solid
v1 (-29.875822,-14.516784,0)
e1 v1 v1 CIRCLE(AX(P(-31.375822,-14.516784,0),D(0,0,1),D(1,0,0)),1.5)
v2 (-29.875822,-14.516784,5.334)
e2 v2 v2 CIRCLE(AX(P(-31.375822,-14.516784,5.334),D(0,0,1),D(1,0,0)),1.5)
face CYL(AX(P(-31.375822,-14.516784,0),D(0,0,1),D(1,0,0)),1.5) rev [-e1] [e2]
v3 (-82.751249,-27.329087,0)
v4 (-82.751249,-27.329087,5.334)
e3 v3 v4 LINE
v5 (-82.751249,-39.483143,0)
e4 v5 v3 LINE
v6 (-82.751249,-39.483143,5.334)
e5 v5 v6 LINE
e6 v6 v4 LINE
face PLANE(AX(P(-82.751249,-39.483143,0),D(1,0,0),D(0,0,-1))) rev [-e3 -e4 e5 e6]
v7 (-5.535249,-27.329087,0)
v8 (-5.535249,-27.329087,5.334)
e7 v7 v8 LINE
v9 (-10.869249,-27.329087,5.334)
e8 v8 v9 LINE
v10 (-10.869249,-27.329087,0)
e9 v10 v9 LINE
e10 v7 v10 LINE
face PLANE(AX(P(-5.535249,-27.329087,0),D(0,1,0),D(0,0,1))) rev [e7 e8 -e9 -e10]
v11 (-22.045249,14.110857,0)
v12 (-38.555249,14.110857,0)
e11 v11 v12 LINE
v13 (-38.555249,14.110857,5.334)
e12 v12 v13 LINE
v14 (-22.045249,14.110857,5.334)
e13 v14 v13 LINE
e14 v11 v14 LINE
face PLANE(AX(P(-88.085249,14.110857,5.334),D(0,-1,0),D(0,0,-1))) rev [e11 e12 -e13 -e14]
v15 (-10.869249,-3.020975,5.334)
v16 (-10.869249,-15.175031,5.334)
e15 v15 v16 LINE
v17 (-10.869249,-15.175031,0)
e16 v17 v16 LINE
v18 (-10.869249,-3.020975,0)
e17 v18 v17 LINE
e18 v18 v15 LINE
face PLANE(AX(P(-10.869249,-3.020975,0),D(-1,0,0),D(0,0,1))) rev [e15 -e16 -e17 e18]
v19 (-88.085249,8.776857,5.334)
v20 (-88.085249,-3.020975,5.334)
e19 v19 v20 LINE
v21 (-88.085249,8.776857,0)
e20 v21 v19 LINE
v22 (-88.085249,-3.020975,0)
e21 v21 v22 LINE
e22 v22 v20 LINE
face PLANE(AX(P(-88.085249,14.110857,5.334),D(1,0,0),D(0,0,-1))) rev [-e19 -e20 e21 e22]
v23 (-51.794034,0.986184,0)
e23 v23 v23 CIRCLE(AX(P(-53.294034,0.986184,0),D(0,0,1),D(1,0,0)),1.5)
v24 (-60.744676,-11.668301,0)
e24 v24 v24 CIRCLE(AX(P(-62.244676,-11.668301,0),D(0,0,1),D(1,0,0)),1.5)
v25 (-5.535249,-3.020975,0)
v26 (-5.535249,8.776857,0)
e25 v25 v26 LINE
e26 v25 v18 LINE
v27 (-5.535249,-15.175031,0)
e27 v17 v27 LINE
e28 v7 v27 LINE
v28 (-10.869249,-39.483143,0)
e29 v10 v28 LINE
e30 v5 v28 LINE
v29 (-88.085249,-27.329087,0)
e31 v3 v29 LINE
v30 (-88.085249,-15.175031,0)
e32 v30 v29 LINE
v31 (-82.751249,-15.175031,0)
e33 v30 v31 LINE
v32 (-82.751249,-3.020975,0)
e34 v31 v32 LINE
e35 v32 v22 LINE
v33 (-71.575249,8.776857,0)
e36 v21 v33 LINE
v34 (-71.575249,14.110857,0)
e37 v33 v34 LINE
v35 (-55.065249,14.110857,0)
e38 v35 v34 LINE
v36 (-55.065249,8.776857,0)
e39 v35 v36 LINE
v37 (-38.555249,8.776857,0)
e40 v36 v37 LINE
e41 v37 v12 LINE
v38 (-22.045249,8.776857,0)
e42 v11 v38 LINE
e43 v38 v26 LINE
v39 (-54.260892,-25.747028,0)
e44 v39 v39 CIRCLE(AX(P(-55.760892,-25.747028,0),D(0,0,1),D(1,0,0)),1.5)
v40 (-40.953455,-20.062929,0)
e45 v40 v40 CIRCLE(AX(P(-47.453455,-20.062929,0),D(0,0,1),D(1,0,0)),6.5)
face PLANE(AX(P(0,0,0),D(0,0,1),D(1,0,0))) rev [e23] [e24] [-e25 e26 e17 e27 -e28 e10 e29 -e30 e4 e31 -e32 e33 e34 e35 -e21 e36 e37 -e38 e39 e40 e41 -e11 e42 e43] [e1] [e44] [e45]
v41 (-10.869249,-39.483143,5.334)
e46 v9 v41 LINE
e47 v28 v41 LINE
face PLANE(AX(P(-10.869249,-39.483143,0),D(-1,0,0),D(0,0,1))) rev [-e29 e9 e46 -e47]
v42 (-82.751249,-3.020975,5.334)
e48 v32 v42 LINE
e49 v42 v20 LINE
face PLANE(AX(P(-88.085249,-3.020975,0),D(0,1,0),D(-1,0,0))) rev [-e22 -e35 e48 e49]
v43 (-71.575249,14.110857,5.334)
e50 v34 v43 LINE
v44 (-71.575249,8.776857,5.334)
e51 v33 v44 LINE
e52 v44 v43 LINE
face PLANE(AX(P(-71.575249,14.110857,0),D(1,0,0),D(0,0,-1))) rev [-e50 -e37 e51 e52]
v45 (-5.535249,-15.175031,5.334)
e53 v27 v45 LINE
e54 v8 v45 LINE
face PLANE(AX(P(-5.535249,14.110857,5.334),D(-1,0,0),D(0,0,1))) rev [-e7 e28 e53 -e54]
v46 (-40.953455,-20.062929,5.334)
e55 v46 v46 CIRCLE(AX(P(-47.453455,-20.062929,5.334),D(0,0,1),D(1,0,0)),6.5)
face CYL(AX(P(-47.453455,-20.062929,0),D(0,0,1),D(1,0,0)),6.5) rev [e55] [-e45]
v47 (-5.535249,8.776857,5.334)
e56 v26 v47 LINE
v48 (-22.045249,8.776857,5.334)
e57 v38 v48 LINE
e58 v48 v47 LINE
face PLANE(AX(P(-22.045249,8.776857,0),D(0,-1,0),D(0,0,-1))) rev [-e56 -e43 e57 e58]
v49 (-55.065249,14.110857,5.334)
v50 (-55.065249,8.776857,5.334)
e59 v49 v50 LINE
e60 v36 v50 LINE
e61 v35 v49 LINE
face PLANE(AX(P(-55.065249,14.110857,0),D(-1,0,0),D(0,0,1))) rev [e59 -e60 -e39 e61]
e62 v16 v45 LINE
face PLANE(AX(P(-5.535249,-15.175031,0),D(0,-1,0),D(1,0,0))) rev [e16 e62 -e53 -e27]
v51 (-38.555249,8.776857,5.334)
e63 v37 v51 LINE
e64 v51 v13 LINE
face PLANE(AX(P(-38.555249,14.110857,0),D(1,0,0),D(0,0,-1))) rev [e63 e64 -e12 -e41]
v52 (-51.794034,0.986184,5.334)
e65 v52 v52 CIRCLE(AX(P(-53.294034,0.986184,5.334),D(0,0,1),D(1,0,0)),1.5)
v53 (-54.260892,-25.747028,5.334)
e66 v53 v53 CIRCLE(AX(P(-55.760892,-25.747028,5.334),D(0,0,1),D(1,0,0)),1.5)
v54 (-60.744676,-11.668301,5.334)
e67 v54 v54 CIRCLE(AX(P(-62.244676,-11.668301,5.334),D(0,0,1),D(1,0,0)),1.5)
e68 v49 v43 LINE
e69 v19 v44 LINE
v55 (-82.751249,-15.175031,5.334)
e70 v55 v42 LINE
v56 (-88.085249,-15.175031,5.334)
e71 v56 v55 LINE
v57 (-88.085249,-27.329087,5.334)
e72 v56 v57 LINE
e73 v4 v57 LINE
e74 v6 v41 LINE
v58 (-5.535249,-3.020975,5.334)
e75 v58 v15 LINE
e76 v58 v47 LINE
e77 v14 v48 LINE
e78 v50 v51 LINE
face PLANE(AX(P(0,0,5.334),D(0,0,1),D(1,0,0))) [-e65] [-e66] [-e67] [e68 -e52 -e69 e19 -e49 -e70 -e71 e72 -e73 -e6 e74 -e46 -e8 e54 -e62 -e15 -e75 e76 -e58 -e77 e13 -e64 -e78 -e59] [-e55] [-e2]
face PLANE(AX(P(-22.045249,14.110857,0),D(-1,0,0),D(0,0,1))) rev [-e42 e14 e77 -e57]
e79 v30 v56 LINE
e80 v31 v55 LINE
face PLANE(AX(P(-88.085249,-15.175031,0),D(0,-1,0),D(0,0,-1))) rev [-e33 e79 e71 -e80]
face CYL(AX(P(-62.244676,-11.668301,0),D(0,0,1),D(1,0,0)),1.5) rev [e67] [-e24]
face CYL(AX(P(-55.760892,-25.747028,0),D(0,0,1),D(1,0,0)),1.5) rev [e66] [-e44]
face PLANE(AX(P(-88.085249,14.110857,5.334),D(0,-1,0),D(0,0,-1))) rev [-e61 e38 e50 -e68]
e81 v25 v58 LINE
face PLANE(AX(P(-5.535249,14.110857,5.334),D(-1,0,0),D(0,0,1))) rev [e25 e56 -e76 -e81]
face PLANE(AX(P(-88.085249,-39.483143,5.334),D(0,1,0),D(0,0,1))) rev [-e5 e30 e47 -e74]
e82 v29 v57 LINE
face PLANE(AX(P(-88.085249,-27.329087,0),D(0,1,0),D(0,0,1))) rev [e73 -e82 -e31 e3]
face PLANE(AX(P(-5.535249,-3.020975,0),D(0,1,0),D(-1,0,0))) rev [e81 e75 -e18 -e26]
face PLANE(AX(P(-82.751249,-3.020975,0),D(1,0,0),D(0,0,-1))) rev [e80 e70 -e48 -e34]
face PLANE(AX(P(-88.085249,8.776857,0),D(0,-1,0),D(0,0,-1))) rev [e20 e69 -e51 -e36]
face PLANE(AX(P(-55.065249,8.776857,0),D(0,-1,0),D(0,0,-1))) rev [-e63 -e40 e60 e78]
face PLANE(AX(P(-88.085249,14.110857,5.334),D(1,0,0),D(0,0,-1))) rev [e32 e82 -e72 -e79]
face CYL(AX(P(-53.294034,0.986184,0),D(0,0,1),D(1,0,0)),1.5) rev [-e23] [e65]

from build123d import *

# Parameters (mm, degrees)
SKETCH1_W                = 82.55
SKETCH1_H                = 53.594
BOSS_EXTRUDE1_DEPTH      = 5.334
CUT_EXTRUDE1_START       = -88.085249325
CUT_EXTRUDE1_OUTLINE_W   = 5.334
CUT_EXTRUDE1_OUTLINE_H   = 5.334
CUT_EXTRUDE1_DEPTH       = 16.51
CUT_EXTRUDE1_START_2     = -55.065249325
CUT_EXTRUDE1_2_OUTLINE_W = 5.334
CUT_EXTRUDE1_2_OUTLINE_H = 5.334
CUT_EXTRUDE1_2_DEPTH     = 16.51
CUT_EXTRUDE1_START_3     = -22.045249325
CUT_EXTRUDE1_3_OUTLINE_W = 5.334
CUT_EXTRUDE1_3_OUTLINE_H = 5.334
CUT_EXTRUDE1_3_DEPTH     = 16.51
SKETCH3_W                = 5.334
SKETCH3_H                = 12.154056038
CUT_EXTRUDE2_DEPTH       = 97.676684204
SKETCH5_R                = 1.5
SKETCH5_R_2              = 6.5
CUT_EXTRUDE4_DEPTH       = 97.676684204


# Read off the part's stored shape, not the designer's step: Cut-Extrude1
with BuildPart() as part:
    # Sketch1 → Boss-Extrude1 (new body)
    with BuildSketch(Plane.XY):
        with Locations((-46.810249325, -12.686142782)):
            Rectangle(SKETCH1_W, SKETCH1_H)
    extrude(amount=BOSS_EXTRUDE1_DEPTH)

    # Cut-Extrude1 outline → Cut-Extrude1 (cut)
    with BuildSketch(Plane.YZ.offset(CUT_EXTRUDE1_START)):
        with Locations((11.443857218, 2.667)):
            Rectangle(CUT_EXTRUDE1_OUTLINE_W, CUT_EXTRUDE1_OUTLINE_H)
    extrude(amount=CUT_EXTRUDE1_DEPTH, mode=Mode.SUBTRACT)

    # Cut-Extrude1 2 outline → Cut-Extrude1 2 (cut)
    with BuildSketch(Plane.YZ.offset(CUT_EXTRUDE1_START_2)):
        with Locations((11.443857218, 2.667)):
            Rectangle(CUT_EXTRUDE1_2_OUTLINE_W, CUT_EXTRUDE1_2_OUTLINE_H)
    extrude(amount=CUT_EXTRUDE1_2_DEPTH, mode=Mode.SUBTRACT)

    # Cut-Extrude1 3 outline → Cut-Extrude1 3 (cut)
    with BuildSketch(Plane.YZ.offset(CUT_EXTRUDE1_START_3)):
        with Locations((11.443857218, 2.667)):
            Rectangle(CUT_EXTRUDE1_3_OUTLINE_W, CUT_EXTRUDE1_3_OUTLINE_H)
    extrude(amount=CUT_EXTRUDE1_3_DEPTH, mode=Mode.SUBTRACT)

    # Sketch3 → Cut-Extrude2 (cut, through all)
    with BuildSketch(Plane.XY.offset(5.334)):
        with Locations((-85.418249325, -33.406114763)):
            Rectangle(SKETCH3_W, SKETCH3_H)
        with Locations((-85.418249325, -9.098002686)):
            Rectangle(SKETCH3_W, SKETCH3_H)
        with Locations((-8.202249325, -33.406114763)):
            Rectangle(SKETCH3_W, SKETCH3_H)
        with Locations((-8.202249325, -9.098002686)):
            Rectangle(SKETCH3_W, SKETCH3_H)
    extrude(amount=-CUT_EXTRUDE2_DEPTH, mode=Mode.SUBTRACT)

    # Sketch5 → Cut-Extrude4 (cut, through all)
    with BuildSketch(Plane.XY.offset(5.334)):
        with Locations((-62.244676311, -11.668301366)):
            Circle(SKETCH5_R)
        with Locations((-55.760892065, -25.747027937)):
            Circle(SKETCH5_R)
        with Locations((-53.29403357, 0.986183789)):
            Circle(SKETCH5_R)
        with Locations((-31.375822338, -14.516784198)):
            Circle(SKETCH5_R)
        with Locations((-47.453455125, -20.062929163)):
            Circle(SKETCH5_R_2)
    extrude(amount=-CUT_EXTRUDE4_DEPTH, mode=Mode.SUBTRACT)


solid = part.part
